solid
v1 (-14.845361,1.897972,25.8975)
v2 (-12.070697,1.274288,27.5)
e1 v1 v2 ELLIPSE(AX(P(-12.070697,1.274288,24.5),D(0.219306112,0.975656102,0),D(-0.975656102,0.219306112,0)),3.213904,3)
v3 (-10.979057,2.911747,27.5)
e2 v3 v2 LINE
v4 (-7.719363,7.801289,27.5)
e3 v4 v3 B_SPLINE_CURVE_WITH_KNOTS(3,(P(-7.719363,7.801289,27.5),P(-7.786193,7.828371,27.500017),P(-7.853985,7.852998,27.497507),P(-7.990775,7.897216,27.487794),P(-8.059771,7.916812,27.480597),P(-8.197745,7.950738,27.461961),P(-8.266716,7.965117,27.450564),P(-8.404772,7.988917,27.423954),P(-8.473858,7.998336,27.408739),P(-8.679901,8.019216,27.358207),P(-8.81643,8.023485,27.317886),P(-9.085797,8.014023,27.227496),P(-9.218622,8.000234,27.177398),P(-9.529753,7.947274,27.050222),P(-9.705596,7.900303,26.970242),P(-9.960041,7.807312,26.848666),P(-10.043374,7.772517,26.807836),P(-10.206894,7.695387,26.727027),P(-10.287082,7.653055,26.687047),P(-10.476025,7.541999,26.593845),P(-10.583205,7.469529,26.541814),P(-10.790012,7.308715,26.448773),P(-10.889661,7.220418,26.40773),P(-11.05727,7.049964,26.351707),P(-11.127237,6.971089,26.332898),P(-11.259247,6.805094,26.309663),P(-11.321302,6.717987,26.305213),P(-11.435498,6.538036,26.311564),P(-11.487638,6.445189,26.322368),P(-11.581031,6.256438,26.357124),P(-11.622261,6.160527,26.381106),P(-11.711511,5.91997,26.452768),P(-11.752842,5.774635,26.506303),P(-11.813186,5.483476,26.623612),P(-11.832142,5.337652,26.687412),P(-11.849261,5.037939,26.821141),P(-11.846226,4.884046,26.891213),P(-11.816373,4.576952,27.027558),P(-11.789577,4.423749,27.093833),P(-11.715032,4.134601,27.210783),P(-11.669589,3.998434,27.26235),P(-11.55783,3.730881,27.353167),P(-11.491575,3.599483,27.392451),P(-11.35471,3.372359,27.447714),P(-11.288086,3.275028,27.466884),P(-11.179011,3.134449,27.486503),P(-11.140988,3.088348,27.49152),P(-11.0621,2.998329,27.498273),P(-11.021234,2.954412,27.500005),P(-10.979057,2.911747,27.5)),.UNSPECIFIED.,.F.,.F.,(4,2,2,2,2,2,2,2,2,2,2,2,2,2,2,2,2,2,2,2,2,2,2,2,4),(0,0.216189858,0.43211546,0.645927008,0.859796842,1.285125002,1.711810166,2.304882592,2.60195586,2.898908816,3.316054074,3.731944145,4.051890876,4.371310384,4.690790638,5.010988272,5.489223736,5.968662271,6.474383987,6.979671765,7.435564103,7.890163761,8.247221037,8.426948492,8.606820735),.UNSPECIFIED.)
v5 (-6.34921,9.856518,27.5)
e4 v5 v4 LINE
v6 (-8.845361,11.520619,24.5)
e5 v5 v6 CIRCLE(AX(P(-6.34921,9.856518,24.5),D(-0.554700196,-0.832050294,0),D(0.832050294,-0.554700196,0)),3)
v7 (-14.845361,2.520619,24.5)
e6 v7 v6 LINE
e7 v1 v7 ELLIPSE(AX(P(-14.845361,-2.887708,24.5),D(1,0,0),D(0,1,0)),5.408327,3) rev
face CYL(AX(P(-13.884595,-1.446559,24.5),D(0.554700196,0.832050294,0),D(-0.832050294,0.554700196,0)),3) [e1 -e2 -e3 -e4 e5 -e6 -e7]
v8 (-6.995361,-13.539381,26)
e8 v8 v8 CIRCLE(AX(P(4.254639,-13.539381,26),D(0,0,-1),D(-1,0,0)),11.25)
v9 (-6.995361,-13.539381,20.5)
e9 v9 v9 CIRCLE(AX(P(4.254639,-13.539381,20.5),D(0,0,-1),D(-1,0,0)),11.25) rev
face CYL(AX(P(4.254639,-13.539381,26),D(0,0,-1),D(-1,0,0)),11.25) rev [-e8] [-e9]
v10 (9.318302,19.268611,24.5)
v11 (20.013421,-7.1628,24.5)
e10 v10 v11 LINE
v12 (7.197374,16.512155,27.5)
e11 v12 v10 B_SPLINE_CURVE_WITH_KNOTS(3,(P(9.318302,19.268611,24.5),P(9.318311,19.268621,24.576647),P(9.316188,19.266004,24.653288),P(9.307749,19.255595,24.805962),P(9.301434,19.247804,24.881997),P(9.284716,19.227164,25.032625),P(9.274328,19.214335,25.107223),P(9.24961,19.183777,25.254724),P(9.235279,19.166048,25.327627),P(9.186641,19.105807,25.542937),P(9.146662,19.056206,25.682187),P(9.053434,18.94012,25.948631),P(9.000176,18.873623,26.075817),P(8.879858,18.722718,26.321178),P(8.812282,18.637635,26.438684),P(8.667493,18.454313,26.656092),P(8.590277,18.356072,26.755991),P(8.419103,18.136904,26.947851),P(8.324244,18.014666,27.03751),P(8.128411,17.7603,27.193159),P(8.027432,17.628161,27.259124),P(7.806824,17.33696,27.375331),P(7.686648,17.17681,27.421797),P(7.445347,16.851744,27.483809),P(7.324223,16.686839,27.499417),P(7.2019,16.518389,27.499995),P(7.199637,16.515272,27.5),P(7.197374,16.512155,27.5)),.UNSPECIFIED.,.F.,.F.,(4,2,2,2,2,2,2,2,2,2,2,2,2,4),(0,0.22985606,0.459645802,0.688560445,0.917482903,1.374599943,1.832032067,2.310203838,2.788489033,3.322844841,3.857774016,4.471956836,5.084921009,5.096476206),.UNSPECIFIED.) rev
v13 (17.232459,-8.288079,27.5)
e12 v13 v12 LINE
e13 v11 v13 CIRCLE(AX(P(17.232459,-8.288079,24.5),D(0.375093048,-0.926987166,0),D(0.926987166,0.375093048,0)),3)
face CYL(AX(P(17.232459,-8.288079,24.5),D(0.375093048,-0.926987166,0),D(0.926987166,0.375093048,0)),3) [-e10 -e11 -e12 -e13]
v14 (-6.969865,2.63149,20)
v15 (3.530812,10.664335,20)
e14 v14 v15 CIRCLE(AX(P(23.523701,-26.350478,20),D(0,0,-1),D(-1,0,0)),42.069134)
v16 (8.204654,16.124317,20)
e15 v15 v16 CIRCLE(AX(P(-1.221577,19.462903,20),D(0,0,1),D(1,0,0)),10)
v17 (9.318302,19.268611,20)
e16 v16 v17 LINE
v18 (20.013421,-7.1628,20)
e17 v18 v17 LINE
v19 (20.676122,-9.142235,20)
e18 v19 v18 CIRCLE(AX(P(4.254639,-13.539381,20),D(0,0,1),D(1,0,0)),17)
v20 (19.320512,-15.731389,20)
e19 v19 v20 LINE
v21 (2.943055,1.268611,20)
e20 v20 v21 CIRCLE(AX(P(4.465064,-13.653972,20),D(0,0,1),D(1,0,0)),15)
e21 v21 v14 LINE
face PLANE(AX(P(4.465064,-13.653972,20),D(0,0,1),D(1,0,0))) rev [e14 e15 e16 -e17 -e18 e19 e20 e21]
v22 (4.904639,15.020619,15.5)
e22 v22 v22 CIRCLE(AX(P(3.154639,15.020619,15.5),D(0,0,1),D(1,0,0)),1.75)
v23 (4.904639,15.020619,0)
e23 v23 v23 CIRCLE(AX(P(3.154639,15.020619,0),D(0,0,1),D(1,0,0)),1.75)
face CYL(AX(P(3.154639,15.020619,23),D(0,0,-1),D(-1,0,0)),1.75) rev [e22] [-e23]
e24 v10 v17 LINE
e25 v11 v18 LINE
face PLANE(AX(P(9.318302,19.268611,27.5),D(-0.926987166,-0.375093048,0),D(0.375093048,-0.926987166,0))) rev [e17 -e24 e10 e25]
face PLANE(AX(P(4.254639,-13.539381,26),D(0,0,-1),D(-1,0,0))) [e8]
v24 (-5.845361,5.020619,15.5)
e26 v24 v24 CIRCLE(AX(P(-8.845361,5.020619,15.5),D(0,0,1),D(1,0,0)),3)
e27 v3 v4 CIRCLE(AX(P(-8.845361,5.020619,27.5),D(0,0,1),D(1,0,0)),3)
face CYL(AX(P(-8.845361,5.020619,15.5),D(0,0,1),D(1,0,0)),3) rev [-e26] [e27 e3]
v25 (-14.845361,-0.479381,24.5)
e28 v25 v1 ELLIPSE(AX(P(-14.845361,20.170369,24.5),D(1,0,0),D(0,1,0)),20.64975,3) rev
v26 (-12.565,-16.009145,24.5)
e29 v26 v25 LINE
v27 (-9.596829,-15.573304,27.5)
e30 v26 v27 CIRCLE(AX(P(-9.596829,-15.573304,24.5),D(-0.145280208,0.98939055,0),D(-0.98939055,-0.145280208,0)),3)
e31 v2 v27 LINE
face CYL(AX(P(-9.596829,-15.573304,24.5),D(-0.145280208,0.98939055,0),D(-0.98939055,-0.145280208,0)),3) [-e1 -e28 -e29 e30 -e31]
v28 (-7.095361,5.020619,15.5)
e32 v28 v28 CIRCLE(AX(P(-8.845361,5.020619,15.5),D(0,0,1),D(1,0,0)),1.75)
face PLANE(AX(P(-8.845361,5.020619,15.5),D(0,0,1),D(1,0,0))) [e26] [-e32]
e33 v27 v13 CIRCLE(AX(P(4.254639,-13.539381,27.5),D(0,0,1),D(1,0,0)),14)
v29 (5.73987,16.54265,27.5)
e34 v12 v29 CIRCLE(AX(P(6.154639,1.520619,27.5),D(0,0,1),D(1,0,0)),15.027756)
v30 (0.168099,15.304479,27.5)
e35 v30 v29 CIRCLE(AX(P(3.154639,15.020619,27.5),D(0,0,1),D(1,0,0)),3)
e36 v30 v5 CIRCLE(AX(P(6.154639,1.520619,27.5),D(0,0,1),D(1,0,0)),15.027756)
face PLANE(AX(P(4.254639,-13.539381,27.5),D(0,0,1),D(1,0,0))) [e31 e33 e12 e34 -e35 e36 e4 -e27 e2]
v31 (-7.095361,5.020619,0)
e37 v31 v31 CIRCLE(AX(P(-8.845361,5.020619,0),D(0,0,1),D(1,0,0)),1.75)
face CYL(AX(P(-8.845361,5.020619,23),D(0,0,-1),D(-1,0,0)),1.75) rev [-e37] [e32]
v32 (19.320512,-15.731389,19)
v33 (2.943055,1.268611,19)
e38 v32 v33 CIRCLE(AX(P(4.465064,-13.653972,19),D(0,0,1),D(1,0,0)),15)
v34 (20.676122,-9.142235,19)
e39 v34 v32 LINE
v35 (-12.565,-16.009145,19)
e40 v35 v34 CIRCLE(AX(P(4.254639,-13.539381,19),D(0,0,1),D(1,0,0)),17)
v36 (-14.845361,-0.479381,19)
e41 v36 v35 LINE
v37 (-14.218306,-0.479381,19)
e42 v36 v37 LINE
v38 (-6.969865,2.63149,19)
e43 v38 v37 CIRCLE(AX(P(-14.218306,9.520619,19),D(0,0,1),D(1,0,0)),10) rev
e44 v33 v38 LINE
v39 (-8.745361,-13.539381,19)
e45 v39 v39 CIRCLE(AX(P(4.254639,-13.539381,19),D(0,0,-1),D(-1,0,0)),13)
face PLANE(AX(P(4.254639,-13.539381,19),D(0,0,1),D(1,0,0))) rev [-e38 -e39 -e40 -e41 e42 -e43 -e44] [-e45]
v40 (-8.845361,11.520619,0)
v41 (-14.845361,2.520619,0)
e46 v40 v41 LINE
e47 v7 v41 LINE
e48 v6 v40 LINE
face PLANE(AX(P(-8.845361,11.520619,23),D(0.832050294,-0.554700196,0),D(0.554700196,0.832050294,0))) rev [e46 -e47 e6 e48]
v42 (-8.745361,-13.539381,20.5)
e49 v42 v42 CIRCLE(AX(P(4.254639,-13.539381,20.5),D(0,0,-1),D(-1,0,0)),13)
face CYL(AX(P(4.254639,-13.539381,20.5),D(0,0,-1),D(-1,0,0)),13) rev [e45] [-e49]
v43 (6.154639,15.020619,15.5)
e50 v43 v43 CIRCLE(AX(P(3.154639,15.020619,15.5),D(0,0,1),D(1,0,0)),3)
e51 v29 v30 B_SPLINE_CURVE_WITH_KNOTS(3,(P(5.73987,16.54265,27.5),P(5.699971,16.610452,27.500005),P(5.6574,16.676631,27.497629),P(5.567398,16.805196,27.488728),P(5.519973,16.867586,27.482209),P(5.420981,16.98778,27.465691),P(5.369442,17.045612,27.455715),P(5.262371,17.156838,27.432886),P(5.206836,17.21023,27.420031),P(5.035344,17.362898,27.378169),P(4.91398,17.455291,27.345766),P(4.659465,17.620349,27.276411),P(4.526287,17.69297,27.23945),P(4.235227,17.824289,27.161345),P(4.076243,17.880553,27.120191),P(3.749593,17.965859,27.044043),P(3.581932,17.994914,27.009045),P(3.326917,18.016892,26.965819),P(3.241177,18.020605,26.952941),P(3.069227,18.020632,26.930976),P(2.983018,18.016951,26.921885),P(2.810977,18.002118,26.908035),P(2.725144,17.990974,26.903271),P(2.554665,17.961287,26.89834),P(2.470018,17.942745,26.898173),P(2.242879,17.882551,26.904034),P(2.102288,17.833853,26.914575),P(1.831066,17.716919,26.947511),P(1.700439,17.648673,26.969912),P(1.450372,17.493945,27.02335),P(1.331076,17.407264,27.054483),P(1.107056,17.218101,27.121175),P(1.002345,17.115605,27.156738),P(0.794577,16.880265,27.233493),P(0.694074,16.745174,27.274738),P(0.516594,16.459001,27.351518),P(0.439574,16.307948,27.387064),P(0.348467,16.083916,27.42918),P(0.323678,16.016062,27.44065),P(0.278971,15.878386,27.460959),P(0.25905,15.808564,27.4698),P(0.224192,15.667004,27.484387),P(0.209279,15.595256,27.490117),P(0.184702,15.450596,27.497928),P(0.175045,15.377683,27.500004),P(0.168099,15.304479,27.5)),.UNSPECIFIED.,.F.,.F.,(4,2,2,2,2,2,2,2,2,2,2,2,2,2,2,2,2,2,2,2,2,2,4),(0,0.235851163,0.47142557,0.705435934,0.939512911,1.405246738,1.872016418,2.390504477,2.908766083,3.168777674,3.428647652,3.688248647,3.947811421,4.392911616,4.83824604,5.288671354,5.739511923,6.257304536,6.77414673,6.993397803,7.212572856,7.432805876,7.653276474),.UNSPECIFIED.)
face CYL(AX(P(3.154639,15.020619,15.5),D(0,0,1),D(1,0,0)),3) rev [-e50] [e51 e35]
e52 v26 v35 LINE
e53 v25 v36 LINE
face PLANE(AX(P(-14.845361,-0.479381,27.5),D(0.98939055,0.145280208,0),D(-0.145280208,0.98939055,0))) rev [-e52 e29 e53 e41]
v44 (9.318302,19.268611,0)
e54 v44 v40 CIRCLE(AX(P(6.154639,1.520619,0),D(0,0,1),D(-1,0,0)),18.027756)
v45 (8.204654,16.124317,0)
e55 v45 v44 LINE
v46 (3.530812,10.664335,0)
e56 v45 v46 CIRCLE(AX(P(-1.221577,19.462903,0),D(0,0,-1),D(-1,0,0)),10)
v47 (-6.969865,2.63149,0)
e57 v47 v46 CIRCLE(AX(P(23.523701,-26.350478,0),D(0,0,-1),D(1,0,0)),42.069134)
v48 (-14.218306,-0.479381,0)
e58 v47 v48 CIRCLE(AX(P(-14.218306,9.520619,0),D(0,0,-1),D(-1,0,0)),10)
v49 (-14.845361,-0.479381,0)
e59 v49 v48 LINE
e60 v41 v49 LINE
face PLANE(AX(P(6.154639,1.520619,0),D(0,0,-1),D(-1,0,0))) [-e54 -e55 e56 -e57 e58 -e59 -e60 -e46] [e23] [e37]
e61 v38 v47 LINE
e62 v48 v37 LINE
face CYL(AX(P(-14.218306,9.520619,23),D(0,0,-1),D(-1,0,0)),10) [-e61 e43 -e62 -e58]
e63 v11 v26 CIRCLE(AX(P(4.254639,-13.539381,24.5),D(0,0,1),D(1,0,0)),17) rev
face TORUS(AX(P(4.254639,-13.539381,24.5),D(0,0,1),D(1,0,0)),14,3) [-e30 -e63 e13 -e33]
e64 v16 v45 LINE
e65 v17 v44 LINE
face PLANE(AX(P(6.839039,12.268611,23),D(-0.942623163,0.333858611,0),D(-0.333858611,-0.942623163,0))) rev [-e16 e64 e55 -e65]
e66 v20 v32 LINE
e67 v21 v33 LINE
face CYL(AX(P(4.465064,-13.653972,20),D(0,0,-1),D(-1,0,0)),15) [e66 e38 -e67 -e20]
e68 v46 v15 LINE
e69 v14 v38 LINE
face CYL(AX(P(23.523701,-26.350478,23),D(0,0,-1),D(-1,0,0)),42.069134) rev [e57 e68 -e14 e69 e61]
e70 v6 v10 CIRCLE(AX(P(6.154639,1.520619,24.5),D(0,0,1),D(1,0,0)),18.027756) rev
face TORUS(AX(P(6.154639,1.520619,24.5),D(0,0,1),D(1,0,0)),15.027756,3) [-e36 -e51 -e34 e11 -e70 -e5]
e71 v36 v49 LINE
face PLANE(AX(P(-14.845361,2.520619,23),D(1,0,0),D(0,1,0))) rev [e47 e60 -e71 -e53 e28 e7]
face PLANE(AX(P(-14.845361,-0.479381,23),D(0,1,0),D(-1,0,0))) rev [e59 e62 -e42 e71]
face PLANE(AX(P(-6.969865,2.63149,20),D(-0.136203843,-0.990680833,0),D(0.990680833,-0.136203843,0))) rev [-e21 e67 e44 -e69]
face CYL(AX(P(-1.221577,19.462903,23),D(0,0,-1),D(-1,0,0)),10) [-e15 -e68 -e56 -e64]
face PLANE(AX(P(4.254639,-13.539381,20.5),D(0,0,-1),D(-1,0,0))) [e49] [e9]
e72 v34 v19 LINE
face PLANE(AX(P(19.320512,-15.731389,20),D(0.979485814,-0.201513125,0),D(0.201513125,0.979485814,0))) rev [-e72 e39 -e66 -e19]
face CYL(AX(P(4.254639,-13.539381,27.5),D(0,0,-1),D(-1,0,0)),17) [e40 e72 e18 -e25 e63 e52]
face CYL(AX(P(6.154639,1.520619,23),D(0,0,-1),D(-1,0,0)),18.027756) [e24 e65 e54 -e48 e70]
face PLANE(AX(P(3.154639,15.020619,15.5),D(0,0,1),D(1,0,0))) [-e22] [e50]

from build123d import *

# Parameters (mm, degrees)
SKETCH1_R                = 1.75
BOSS_EXTRUDE1_DEPTH      = 23
FILLET3_R                = 10
BOSS_EXTRUDE2_DEPTH      = 4.5
BOSS_EXTRUDE2_DEPTH_BACK = 4
SKETCH3_R                = 1.75
SKETCH4_R                = 11.25
CUT_EXTRUDE1_DEPTH       = 7
SKETCH5_R                = 13
CUT_EXTRUDE2_DEPTH       = 1.5
SKETCH6_R                = 3
CUT_EXTRUDE3_DEPTH       = 12
CUT_EXTRUDE4_DEPTH       = 1
FILLET7_R                = 3
FILLET8_R                = 10


with BuildPart() as part:
    # Sketch1 → Boss-Extrude1 (new body)
    with BuildSketch(Plane.XY):
        with BuildLine():
            Line((-8.845360825, 11.520618557), (-14.845360825, 2.520618557))
            Line((-14.845360825, 2.520618557), (-14.845360825, -0.479381443))
            Line((-14.845360825, -0.479381443), (-9.845360825, -0.479381443))
            Line((-9.845360825, -0.479381443), (-8.845360825, 0.520618557))
            ThreePointArc((-8.845360825, 0.520618557), (-1.696742799, 7.320595709), (6.83903909, 12.26861112))
            Line((6.83903909, 12.26861112), (9.318301605, 19.26861112))
            ThreePointArc((9.318301605, 19.26861112), (-0.918731235, 18.102760488), (-8.845360825, 11.520618557))
        make_face()
        with Locations((-8.845360825, 5.020618557)):
            Circle(SKETCH1_R, mode=Mode.SUBTRACT)
        with Locations((3.154639175, 15.020618557)):
            Circle(SKETCH1_R, mode=Mode.SUBTRACT)
    extrude(amount=BOSS_EXTRUDE1_DEPTH)

    # Fillet3
    # the kernel refuses this fillet: 10 mm, written as the material it takes off along each edge
    with BuildSketch(Plane(origin=(-9.845360825, -0.479381443, -10.932362995), x_dir=(-1, 0, 0), z_dir=(0, 0, 1))) as fillet3_piece_1:
        with BuildLine():
            CenterArc((4.372945198, -10), FILLET3_R, 90, 46.455884642)
            Line((-2.87549632, -3.110871204), (-3.600340471, -2.421958325))
            ThreePointArc((-3.600340471, -2.421958325), (-1.769425443, -0.361263367), (-0.707106781, 0.707106781))
            Line((-0.707106781, 0.707106781), (0, 1))
            Line((0, 1), (4.372945198, 1))
            Line((4.372945198, 1), (4.372945198, 0))
        make_face()
    extrude(amount=44.86472599, mode=Mode.SUBTRACT)

    # Sketch3 → Boss-Extrude2 (add, two sides: drawn at the far end of the back side and taken through both)
    with BuildSketch(Plane.XY.offset(23).offset(-BOSS_EXTRUDE2_DEPTH_BACK)):
        with BuildLine():
            Line((-14.845360825, 2.520618557), (-14.845360825, -0.479381443))
            Line((-14.845360825, -0.479381443), (-12.565000182, -16.009144975))
            ThreePointArc((-12.565000182, -16.009144975), (8.709502938, -29.945300767), (20.013420995, -7.162799635))
            Line((20.013420995, -7.162799635), (9.318301605, 19.26861112))
            ThreePointArc((9.318301605, 19.26861112), (-0.918731235, 18.102760488), (-8.845360825, 11.520618557))
            Line((-8.845360825, 11.520618557), (-14.845360825, 2.520618557))
        make_face()
        with Locations((3.154639175, 15.020618557)):
            Circle(SKETCH3_R, mode=Mode.SUBTRACT)
        with Locations((-8.845360825, 5.020618557)):
            Circle(SKETCH3_R, mode=Mode.SUBTRACT)
    extrude(amount=BOSS_EXTRUDE2_DEPTH + BOSS_EXTRUDE2_DEPTH_BACK)

    # Sketch4 → Cut-Extrude1 (cut)
    with BuildSketch(Plane(origin=(0, 0, 19), x_dir=(-1, 0, 0), z_dir=(0, 0, -1))):
        with Locations((-4.254639175, -13.539381443)):
            Circle(SKETCH4_R)
    extrude(amount=-CUT_EXTRUDE1_DEPTH, mode=Mode.SUBTRACT)

    # Sketch5 → Cut-Extrude2 (cut)
    with BuildSketch(Plane(origin=(0, 0, 19), x_dir=(-1, 0, 0), z_dir=(0, 0, -1))):
        with Locations((-4.254639175, -13.539381443)):
            Circle(SKETCH5_R)
    extrude(amount=-CUT_EXTRUDE2_DEPTH, mode=Mode.SUBTRACT)

    # Sketch6 → Cut-Extrude3 (cut)
    with BuildSketch(Plane.XY.offset(27.5)):
        with Locations((-8.845360825, 5.020618557)):
            Circle(SKETCH6_R)
        with Locations((3.154639175, 15.020618557)):
            Circle(SKETCH6_R)
    extrude(amount=-CUT_EXTRUDE3_DEPTH, mode=Mode.SUBTRACT)

    # Sketch7 → Cut-Extrude4 (cut)
    with BuildSketch(Plane(origin=(0, 0, 19), x_dir=(-1, 0, 0), z_dir=(0, 0, -1))):
        with BuildLine():
            Line((-19.320512006, -15.73138888), (-26.521187379, 19.26861112))
            Line((-26.521187379, 19.26861112), (-9.318301605, 19.26861112))
            Line((-9.318301605, 19.26861112), (-6.83903909, 12.26861112))
            ThreePointArc((-6.83903909, 12.26861112), (0.552528201, 8.148031782), (6.969864505, 2.631489761))
            Line((6.969864505, 2.631489761), (-2.943055137, 1.26861112))
            ThreePointArc((-2.943055137, 1.26861112), (-15.267616881, -3.247010549), (-19.320512006, -15.73138888))
        make_face()
    extrude(amount=-CUT_EXTRUDE4_DEPTH, mode=Mode.SUBTRACT)

    # Fillet7
    # the kernel refuses this fillet: 3 mm, written as the material it takes off along each edge
    with BuildSketch(Plane(origin=(-8.845360825, 11.520618557, 27.5), x_dir=(0, 0, -1), z_dir=(-0.554700196225229, -0.8320502943378438, 0))) as fillet7_piece_1:
        with BuildLine():
            CenterArc((FILLET7_R, FILLET7_R), FILLET7_R, 180, 90)
            Line((0, FILLET7_R), (0, 0))
            Line((0, 0), (FILLET7_R, 0))
        make_face()
    extrude(amount=18.316653826, mode=Mode.SUBTRACT)
    with BuildSketch(Plane(origin=(-18.114165499, 21.781905941, 27.5), x_dir=(0, 0, -1), z_dir=(0.14528020772302286, -0.9893905504116943, 0))) as fillet7_piece_2:
        with BuildLine():
            CenterArc((FILLET7_R, FILLET7_R), FILLET7_R, 180, 90)
            Line((0, FILLET7_R), (0, 0))
            Line((0, 0), (FILLET7_R, 0))
        make_face()
    extrude(amount=38.196292556, mode=Mode.SUBTRACT)
    with BuildSketch(Plane(origin=(4.254639175, -13.539381443, 27.5), x_dir=(-0.9893905504116943, -0.14528020772302197, 0), z_dir=(-0.14528020772302197, 0.9893905504116943, 0))) as fillet7_piece_3:
        with BuildLine():
            CenterArc((17 - FILLET7_R, -FILLET7_R), FILLET7_R, 0, 90)
            Line((17 - FILLET7_R, 0), (17, 0))
            Line((17, 0), (17, -FILLET7_R))
        make_face()
    revolve(axis=Axis((4.254639175, -13.539381443, 27.5), (0, 0, 1)), revolution_arc=193.67655813, mode=Mode.SUBTRACT)
    with BuildSketch(Plane(origin=(6.154639175, 1.520618557, 27.5), x_dir=(0.5584515746383966, 0.8295371232102247, 0), z_dir=(0.8295371232102247, -0.5584515746383966, 0))) as fillet7_piece_4:
        with BuildLine():
            CenterArc((18.027756377 - FILLET7_R, -FILLET7_R), FILLET7_R, 0, 90)
            Line((18.027756377 - FILLET7_R, 0), (18.027756377, 0))
            Line((18.027756377, 0), (18.027756377, -FILLET7_R))
        make_face()
    revolve(axis=Axis((6.154639175, 1.520618557, 27.5), (0, 0, 1)), revolution_arc=90.258713785, mode=Mode.SUBTRACT)
    with BuildSketch(Plane(origin=(20.013420995, -7.162799635, 27.5), x_dir=(-0.9269871658598542, -0.3750930475643543, 0), z_dir=(-0.37509304756435435, 0.9269871658598543, 0))) as fillet7_piece_5:
        with BuildLine():
            CenterArc((FILLET7_R, -FILLET7_R), FILLET7_R, 90, 90)
            Line((0, -FILLET7_R), (0, 0))
            Line((0, 0), (FILLET7_R, 0))
        make_face()
    extrude(amount=36.013243471, mode=Mode.SUBTRACT)

    # Fillet8
    fillet8_edges = [part.edges().sort_by_distance(p)[0] for p in [
        (6.83903909, 12.26861112, 10),
    ]]
    fillet(fillet8_edges, radius=FILLET8_R)


solid = part.part
